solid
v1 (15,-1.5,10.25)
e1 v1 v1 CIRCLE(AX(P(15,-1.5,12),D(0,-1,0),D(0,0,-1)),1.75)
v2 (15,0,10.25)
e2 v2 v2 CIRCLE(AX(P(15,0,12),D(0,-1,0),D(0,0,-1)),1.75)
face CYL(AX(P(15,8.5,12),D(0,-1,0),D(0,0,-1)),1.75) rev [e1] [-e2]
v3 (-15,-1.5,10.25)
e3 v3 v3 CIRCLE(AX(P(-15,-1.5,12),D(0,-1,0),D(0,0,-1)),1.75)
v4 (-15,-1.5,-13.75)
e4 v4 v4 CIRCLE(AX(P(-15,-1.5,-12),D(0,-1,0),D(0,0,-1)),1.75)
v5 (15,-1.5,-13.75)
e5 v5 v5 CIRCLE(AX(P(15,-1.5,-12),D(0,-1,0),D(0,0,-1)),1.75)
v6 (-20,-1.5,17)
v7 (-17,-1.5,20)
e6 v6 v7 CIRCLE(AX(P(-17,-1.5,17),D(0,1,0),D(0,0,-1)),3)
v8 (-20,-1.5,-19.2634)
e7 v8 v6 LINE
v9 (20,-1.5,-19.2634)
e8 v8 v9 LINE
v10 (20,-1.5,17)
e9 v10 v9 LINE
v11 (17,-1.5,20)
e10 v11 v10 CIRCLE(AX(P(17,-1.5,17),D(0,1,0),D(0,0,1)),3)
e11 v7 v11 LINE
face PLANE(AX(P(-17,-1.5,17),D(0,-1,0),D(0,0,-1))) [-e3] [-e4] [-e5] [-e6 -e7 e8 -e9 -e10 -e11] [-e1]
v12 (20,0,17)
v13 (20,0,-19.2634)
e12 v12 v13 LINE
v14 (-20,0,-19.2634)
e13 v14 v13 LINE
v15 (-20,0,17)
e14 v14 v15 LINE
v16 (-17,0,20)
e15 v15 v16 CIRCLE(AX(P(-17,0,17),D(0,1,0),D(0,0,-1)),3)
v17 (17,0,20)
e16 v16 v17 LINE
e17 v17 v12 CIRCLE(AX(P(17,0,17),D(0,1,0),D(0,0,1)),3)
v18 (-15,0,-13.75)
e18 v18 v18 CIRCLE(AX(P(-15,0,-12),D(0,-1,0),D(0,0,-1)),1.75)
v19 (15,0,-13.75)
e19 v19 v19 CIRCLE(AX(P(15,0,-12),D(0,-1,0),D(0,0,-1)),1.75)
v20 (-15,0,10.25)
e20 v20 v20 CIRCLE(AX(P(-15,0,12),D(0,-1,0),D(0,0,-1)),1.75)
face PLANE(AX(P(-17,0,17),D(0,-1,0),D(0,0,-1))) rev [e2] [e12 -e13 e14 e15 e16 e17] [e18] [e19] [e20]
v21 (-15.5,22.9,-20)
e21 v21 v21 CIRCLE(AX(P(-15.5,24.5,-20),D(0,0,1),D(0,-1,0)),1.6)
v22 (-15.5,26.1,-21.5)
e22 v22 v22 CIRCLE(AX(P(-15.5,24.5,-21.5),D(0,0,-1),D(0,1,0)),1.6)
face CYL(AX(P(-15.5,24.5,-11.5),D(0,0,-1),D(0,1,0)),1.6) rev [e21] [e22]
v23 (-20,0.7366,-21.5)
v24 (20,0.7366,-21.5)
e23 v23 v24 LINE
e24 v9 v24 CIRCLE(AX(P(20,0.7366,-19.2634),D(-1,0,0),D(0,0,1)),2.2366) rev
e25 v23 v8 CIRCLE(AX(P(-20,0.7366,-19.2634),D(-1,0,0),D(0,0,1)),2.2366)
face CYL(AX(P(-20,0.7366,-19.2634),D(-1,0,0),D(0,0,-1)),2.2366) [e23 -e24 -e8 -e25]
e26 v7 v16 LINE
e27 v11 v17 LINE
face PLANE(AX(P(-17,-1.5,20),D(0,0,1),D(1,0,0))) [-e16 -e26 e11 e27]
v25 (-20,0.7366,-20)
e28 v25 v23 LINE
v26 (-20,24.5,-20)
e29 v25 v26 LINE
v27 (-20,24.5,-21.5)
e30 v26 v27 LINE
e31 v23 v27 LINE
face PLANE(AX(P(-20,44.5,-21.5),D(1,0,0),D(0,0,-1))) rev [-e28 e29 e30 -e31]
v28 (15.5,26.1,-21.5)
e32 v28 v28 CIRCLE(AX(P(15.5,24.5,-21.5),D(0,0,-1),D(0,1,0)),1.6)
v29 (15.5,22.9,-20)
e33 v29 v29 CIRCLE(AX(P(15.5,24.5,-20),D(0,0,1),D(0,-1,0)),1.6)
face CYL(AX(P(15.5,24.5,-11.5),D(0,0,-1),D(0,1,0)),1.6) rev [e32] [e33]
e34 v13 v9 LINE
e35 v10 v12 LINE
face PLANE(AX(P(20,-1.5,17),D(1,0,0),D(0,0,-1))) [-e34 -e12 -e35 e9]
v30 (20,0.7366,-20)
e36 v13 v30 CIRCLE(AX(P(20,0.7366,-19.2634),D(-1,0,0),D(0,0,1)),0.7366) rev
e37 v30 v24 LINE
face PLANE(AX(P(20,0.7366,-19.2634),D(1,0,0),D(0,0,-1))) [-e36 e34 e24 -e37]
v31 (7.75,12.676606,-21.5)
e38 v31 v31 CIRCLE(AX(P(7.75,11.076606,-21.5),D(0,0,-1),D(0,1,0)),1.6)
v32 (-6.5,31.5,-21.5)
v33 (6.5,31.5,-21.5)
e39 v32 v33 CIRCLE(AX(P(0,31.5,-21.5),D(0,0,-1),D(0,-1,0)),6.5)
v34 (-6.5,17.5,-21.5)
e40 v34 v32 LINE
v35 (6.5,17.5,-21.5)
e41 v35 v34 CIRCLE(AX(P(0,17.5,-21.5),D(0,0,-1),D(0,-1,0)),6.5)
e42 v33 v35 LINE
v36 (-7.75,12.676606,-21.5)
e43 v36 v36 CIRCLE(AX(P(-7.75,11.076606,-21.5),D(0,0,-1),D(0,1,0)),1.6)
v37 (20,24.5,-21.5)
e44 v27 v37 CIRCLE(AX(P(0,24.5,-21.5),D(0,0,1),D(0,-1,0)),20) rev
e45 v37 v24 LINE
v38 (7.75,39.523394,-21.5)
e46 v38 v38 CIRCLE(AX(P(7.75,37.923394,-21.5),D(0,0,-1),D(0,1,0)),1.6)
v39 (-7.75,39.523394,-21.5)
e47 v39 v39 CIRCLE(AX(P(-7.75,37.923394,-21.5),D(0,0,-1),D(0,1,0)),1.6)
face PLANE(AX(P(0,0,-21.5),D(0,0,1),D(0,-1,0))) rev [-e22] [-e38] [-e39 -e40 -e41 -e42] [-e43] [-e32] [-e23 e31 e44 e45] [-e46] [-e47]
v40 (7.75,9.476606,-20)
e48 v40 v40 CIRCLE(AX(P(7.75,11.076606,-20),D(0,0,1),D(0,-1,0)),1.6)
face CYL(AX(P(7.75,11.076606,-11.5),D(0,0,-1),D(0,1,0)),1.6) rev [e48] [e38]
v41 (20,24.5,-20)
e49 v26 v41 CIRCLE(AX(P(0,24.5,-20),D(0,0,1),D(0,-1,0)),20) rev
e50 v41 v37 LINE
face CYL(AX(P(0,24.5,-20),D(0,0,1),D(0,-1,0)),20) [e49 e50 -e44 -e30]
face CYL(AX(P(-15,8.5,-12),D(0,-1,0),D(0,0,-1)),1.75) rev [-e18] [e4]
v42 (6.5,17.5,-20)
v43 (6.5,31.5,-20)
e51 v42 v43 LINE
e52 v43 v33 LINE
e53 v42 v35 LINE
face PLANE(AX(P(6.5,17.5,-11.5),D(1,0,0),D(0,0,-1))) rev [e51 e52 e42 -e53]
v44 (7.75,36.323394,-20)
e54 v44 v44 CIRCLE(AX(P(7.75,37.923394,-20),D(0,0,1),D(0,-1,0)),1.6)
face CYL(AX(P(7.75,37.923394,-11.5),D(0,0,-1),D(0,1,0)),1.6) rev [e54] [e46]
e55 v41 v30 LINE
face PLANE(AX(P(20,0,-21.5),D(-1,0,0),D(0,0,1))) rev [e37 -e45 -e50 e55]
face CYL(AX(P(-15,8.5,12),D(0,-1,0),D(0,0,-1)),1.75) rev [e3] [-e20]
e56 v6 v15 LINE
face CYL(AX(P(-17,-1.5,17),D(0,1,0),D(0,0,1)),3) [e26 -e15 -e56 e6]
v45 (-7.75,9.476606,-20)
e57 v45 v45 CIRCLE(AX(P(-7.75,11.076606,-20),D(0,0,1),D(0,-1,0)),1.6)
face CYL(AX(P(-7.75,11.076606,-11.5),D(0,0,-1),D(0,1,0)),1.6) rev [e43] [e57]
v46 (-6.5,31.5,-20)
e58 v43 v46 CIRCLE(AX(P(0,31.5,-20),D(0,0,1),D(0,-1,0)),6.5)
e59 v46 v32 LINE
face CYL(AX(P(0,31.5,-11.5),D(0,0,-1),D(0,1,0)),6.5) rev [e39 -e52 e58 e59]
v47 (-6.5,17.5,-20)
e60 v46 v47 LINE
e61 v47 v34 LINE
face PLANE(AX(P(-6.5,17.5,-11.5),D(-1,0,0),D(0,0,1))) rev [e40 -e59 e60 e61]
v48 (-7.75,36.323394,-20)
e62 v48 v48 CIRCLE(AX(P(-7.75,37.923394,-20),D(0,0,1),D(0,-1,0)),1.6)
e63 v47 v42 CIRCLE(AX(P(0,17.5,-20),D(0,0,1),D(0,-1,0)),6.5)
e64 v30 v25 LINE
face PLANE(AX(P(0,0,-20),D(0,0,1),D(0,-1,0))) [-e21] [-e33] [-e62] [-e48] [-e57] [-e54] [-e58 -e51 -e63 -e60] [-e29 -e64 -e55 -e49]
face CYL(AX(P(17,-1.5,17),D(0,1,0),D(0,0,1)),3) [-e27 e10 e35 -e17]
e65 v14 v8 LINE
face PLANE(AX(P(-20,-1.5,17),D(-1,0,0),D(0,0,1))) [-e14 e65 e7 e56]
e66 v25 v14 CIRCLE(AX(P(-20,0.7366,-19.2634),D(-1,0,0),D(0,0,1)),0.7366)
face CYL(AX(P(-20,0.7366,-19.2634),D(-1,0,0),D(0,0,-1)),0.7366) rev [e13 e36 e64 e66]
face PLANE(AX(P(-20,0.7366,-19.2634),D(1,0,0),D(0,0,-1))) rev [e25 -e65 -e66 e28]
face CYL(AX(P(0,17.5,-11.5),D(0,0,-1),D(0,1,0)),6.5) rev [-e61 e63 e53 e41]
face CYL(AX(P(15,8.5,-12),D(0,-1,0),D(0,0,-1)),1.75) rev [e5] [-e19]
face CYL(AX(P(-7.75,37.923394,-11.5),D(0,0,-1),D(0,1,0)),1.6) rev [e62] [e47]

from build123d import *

# Parameters (mm, degrees)
SM_BASE_FLANGE_1_DEPTH           = 1.5
SM_EDGE_FLANGE_1_STRIP_W         = 7.4732
SM_EDGE_FLANGE_1_STRIP_H         = 1.5
SM_EDGE_FLANGE_1_STRIP_CUT_DEPTH = 40
SM_EDGE_FLANGE_1_DEPTH           = 40
CUT_EXTRUDE_1_DEPTH              = 10
SKETCH_10_R                      = 1.6
CUT_EXTRUDE_2_DEPTH              = 10
SKETCH_11_R                      = 1.75
CUT_EXTRUDE_3_DEPTH              = 10


# Sheet-metal steps are written as plain solids
with BuildPart() as part:
    # Sketch 1 → 基体-法兰1 (new body)
    with BuildSketch(Plane(origin=(0, 0, 0), x_dir=(1, 0, 0), z_dir=(0, 1, 0))):
        with BuildLine():
            Line((-17, -20), (17, -20))
            ThreePointArc((17, -20), (19.121320344, -19.121320344), (20, -17))
            Line((20, -17), (20, 20))
            Line((20, 20), (-20, 20))
            Line((-20, 20), (-20, -17))
            ThreePointArc((-20, -17), (-19.121320344, -19.121320344), (-17, -20))
        make_face()
    extrude(amount=-SM_BASE_FLANGE_1_DEPTH)

    # 边线-法兰1 strip (across the edge) → 边线-法兰1 strip cut (cut)
    with BuildSketch(Plane(origin=(20, 0, -20), x_dir=(0, 0, 1), z_dir=(-1, 0, 0))):
        with Locations((-3, -0.75)):
            Rectangle(SM_EDGE_FLANGE_1_STRIP_W, SM_EDGE_FLANGE_1_STRIP_H)
    extrude(amount=SM_EDGE_FLANGE_1_STRIP_CUT_DEPTH, mode=Mode.SUBTRACT)

    # 边线-法兰1 section (across the edge) → 边线-法兰1 (add)
    with BuildSketch(Plane(origin=(20, 0, -20), x_dir=(0, 0, 1), z_dir=(-1, 0, 0))):
        with BuildLine():
            Line((-1.5, 0.7366), (-1.5, 44.5))
            Line((-1.5, 44.5), (0, 44.5))
            Line((0, 44.5), (0, 0.7366))
            ThreePointArc((0, 0.7366), (0.215745145, 0.215745145), (0.7366, 0))
            Line((0.7366, 0), (0.7366, -1.5))
            ThreePointArc((0.7366, -1.5), (-0.844915027, -0.844915027), (-1.5, 0.7366))
        make_face()
    extrude(amount=SM_EDGE_FLANGE_1_DEPTH)

    # 草图9 → 切除-拉伸1 (cut)
    with BuildSketch(Plane(origin=(0, 0, -21.5), x_dir=(-1, 0, 0), z_dir=(0, 0, -1))):
        with BuildLine():
            Line((-20, 24.5), (-20, 44.5))
            Line((-20, 44.5), (25.146997012, 48.516846867))
            Line((25.146997012, 48.516846867), (20, 24.5))
            ThreePointArc((20, 24.5), (0, 44.5), (-20, 24.5))
        make_face()
    extrude(amount=-CUT_EXTRUDE_1_DEPTH, mode=Mode.SUBTRACT)

    # 草图10 → 切除-拉伸2 (cut)
    with BuildSketch(Plane(origin=(0, 0, -21.5), x_dir=(-1, 0, 0), z_dir=(0, 0, -1))):
        with Locations(Location((7.75, 37.923393759, 0), (0, 0, 90))):
            Circle(SKETCH_10_R)
        with Locations(Location((15.5, 24.5, 0), (0, 0, 90))):
            Circle(SKETCH_10_R)
        with Locations(Location((7.75, 11.076606241, 0), (0, 0, 90))):
            Circle(SKETCH_10_R)
        with Locations(Location((-7.75, 11.076606241, 0), (0, 0, 90))):
            Circle(SKETCH_10_R)
        with Locations(Location((-15.5, 24.5, 0), (0, 0, 90))):
            Circle(SKETCH_10_R)
        with Locations(Location((-7.75, 37.923393759, 0), (0, 0, 90))):
            Circle(SKETCH_10_R)
        with BuildLine():
            Line((-6.5, 17.5), (-6.5, 31.5))
            ThreePointArc((-6.5, 31.5), (0, 38), (6.5, 31.5))
            Line((6.5, 31.5), (6.5, 17.5))
            ThreePointArc((6.5, 17.5), (0, 11), (-6.5, 17.5))
        make_face()
    extrude(amount=-CUT_EXTRUDE_2_DEPTH, mode=Mode.SUBTRACT)

    # 草图11 → 切除-拉伸3 (cut)
    with BuildSketch(Plane.XZ.offset(1.5)):
        with Locations(Location((15, 12, 0), (0, 0, 270))):
            Circle(SKETCH_11_R)
        with Locations(Location((-15, 12, 0), (0, 0, 270))):
            Circle(SKETCH_11_R)
        with Locations(Location((-15, -12, 0), (0, 0, 270))):
            Circle(SKETCH_11_R)
        with Locations(Location((15, -12, 0), (0, 0, 270))):
            Circle(SKETCH_11_R)
    extrude(amount=-CUT_EXTRUDE_3_DEPTH, mode=Mode.SUBTRACT)


solid = part.part
